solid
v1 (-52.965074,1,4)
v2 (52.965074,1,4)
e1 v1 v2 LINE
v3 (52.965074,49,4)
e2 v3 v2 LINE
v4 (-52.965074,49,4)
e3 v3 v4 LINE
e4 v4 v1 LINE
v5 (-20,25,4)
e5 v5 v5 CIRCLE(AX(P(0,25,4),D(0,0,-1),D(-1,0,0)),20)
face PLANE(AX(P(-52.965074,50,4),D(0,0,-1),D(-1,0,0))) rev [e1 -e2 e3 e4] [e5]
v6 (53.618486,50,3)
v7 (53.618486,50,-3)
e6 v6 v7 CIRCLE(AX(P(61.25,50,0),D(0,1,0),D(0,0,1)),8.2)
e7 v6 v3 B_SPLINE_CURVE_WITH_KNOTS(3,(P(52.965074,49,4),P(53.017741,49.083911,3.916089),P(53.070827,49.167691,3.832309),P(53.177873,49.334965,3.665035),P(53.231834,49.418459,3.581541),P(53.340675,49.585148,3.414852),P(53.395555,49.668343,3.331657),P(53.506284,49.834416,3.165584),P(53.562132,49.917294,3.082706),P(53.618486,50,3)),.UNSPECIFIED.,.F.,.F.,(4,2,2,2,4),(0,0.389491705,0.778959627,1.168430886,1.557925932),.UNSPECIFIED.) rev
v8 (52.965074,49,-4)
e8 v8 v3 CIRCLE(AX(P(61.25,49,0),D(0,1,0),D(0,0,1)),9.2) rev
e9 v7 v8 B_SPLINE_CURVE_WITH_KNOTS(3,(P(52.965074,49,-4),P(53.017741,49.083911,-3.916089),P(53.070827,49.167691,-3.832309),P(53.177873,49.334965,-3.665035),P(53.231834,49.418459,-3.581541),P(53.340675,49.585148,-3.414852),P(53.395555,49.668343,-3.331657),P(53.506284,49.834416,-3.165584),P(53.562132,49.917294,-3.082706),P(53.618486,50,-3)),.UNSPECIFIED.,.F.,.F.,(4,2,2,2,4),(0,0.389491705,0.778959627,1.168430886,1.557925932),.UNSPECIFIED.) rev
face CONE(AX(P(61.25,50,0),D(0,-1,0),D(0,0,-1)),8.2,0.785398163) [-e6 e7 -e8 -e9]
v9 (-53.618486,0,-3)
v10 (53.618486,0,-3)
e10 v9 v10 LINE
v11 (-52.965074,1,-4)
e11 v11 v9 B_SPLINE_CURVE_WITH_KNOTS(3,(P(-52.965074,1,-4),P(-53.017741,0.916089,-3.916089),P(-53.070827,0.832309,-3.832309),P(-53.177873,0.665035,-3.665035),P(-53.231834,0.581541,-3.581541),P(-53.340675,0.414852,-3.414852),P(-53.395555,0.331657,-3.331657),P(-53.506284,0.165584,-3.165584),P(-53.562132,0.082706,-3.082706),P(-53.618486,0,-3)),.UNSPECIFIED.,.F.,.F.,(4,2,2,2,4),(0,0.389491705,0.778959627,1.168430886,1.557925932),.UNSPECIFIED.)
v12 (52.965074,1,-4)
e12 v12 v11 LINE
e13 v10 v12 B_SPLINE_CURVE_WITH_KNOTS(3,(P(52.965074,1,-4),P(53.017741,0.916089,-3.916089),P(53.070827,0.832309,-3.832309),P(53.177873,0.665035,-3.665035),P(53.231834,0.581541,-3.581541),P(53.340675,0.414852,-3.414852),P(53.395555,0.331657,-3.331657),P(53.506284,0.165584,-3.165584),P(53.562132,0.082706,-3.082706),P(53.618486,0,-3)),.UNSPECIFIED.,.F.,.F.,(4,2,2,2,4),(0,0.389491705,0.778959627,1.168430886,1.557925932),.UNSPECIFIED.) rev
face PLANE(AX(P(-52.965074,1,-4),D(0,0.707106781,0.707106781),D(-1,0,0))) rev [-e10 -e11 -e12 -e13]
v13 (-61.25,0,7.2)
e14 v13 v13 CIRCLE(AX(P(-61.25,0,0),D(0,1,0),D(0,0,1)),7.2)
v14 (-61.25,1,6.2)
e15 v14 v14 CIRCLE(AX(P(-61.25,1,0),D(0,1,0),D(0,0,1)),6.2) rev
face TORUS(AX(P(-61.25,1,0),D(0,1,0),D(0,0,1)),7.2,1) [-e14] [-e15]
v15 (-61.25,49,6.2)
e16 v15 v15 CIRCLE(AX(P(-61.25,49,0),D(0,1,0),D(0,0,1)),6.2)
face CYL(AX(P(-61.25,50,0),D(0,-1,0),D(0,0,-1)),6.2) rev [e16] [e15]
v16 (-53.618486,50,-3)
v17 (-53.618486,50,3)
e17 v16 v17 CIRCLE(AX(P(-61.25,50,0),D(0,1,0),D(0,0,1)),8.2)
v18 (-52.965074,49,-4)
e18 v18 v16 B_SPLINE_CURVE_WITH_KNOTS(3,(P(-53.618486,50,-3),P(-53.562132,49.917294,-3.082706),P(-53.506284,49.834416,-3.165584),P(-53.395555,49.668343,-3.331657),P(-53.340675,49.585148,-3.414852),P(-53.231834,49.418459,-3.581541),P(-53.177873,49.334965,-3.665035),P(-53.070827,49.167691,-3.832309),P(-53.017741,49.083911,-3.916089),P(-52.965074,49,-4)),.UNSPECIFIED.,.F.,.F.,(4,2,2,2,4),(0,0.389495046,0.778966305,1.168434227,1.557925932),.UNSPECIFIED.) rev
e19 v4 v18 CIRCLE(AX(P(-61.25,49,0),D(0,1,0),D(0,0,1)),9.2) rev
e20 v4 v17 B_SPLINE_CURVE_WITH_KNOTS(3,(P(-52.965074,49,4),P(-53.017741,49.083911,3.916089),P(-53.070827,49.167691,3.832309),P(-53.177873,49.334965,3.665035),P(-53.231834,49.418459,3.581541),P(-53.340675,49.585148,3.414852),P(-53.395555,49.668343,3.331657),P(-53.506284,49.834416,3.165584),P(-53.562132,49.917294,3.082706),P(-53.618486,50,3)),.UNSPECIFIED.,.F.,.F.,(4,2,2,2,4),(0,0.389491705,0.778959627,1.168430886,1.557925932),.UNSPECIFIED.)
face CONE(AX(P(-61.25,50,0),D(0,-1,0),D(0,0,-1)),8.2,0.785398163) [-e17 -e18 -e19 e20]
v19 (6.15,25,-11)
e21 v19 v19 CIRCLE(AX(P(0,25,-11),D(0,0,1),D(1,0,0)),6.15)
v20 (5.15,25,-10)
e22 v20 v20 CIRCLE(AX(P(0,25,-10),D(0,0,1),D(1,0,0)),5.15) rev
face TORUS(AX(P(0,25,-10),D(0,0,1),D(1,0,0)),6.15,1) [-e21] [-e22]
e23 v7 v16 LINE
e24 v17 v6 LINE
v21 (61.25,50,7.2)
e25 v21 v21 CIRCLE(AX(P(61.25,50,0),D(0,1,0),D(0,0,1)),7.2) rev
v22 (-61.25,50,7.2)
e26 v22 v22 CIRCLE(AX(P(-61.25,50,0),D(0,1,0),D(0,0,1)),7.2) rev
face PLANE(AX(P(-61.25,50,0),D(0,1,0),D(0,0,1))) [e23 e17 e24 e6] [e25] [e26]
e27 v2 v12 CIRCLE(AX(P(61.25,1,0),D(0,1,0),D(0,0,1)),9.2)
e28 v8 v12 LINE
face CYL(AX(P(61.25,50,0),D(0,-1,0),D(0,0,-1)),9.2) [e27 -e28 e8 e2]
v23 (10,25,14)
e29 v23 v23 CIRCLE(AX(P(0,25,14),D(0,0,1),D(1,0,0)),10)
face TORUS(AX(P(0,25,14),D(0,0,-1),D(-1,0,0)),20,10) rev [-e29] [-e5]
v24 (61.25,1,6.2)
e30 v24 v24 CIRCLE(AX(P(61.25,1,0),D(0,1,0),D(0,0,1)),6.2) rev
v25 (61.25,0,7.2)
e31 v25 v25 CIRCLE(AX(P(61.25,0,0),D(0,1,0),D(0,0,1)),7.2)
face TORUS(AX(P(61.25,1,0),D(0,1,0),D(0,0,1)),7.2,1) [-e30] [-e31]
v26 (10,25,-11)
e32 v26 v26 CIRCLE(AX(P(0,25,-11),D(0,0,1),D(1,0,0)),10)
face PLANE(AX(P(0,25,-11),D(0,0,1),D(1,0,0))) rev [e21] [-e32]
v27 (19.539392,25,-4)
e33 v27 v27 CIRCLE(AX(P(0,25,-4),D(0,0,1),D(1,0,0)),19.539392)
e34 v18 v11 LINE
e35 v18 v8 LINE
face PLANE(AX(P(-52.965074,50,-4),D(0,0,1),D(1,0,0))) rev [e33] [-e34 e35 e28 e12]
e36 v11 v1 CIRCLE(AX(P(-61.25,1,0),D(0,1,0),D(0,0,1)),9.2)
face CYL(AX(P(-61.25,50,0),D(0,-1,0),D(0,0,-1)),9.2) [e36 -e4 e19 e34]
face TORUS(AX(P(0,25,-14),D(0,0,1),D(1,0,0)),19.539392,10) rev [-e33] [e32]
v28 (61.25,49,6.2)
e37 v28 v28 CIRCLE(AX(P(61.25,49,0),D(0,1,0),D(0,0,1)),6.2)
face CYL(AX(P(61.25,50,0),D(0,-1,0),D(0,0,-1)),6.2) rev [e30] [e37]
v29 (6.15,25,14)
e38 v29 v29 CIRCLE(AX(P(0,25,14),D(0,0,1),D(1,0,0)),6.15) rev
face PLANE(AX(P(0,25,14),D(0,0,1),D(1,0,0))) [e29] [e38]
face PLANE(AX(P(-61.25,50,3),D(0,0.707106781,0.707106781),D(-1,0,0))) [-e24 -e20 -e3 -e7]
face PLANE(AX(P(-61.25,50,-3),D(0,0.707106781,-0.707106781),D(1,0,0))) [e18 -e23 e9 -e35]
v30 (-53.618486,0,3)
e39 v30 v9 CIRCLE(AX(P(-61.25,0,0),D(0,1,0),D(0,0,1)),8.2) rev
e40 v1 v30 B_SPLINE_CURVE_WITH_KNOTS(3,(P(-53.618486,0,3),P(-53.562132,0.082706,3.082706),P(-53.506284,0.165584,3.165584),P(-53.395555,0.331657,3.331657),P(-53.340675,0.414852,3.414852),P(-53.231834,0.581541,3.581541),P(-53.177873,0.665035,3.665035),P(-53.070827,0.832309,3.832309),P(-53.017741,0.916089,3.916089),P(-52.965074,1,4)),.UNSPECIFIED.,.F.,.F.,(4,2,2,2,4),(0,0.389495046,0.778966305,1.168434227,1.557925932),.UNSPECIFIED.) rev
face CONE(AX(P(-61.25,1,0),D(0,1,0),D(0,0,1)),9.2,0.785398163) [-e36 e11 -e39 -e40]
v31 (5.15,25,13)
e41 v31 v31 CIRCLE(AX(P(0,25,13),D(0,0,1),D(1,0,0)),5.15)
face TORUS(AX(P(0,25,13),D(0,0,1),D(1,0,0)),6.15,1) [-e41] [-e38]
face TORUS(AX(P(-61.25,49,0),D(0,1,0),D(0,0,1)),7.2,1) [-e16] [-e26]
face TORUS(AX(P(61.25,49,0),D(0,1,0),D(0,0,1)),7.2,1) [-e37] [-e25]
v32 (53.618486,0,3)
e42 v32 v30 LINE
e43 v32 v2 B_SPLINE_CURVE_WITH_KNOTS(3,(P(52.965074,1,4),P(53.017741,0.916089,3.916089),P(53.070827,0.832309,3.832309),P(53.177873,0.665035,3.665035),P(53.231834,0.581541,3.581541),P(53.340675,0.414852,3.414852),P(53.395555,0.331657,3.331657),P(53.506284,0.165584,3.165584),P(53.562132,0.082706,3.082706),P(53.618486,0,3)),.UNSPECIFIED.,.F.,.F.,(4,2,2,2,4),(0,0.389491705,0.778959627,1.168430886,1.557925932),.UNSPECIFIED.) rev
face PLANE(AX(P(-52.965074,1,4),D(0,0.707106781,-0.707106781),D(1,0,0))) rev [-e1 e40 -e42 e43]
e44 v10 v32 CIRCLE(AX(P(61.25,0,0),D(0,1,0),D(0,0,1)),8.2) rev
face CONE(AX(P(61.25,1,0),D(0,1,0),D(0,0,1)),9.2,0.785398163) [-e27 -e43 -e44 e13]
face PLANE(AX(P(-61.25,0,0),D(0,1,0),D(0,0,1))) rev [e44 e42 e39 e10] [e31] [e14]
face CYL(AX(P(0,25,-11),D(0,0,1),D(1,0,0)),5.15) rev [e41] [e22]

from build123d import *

# Parameters (mm, degrees)
SKETCH1_R                = 6.2
BOSS_EXTRUDE1_DEPTH      = 50
BOSS_EXTRUDE2_DEPTH      = 10
BOSS_EXTRUDE2_DEPTH_BACK = 15
SKETCH2_R                = 10
SKETCH2_R_2              = 5.15
SKETCH3_R                = 5.15
CUT_EXTRUDE2_DEPTH       = 10
FILLET1_R                = 10
FILLET2_R                = 1
CHAMFER1_SIZE            = 1


with BuildPart() as part:
    # Sketch1 → Boss-Extrude1 (new body)
    with BuildSketch(Plane(origin=(0, 0, 0), x_dir=(1, 0, 0), z_dir=(0, 1, 0))):
        with BuildLine():
            Line((-52.965073929, 4), (52.965073929, 4))
            ThreePointArc((52.965073929, 4), (70.45, 0), (52.965073929, -4))
            Line((52.965073929, -4), (-52.965073929, -4))
            ThreePointArc((-52.965073929, -4), (-70.45, 0), (-52.965073929, 4))
        make_face()
        with Locations(Location((-61.25, 0, 0), (0, 0, 270))):
            Circle(SKETCH1_R, mode=Mode.SUBTRACT)
        with Locations(Location((61.25, 0, 0), (0, 0, 90))):
            Circle(SKETCH1_R, mode=Mode.SUBTRACT)
    extrude(amount=BOSS_EXTRUDE1_DEPTH)

    # Sketch2 → Boss-Extrude2 (add, two sides: drawn at the far end of the back side and taken through both)
    with BuildSketch(Plane.XY.offset(4).offset(-BOSS_EXTRUDE2_DEPTH_BACK)):
        with Locations((0, 25)):
            Circle(SKETCH2_R)
        with Locations((0, 25)):
            Circle(SKETCH2_R_2, mode=Mode.SUBTRACT)
    extrude(amount=BOSS_EXTRUDE2_DEPTH + BOSS_EXTRUDE2_DEPTH_BACK)

    # Sketch3 → Cut-Extrude2 (cut)
    with BuildSketch(Plane.XY.offset(4)):
        with Locations((0, 25)):
            Circle(SKETCH3_R)
    extrude(amount=-CUT_EXTRUDE2_DEPTH, mode=Mode.SUBTRACT)

    # Fillet1
    # the kernel refuses this fillet: 10 mm, written as the material it adds along each edge
    with BuildSketch(Plane(origin=(0, 25, 4), x_dir=(1, 0, 0), z_dir=(0, -1, 0))) as fillet1_piece_1:
        with BuildLine():
            CenterArc((10 + FILLET1_R, FILLET1_R), FILLET1_R, 180, 90)
            Line((10, FILLET1_R), (10 - FILLET1_R * 0.02, FILLET1_R))
            Line((10 - FILLET1_R * 0.02, FILLET1_R), (10 - FILLET1_R * 0.02, -FILLET1_R * 0.02))
            Line((10 - FILLET1_R * 0.02, -FILLET1_R * 0.02), (10 + FILLET1_R, -FILLET1_R * 0.02))
            Line((10 + FILLET1_R, -FILLET1_R * 0.02), (10 + FILLET1_R, 0))
        make_face()
    revolve(axis=Axis((0, 25, 4), (0, 0, 1)))
    with BuildSketch(Plane(origin=(0, 25, -4), x_dir=(1, 0, 0), z_dir=(0, -1, 0))) as fillet1_piece_2:
        with BuildLine():
            CenterArc((19.539392014, -10), FILLET1_R, 90, 72.542396876)
            Line((10, -7), (9.80921216, -6.94))
            ThreePointArc((9.80921216, -6.94), (9.8, -3.5), (9.8, 0))
            Line((9.8, 0), (10, 0.2))
            Line((10, 0.2), (19.539392014, 0.2))
            Line((19.539392014, 0.2), (19.539392014, 0))
        make_face()
    revolve(axis=Axis((0, 25, -4), (0, 0, 1)))

    # Fillet2
    fillet2_edges = [part.edges().sort_by_distance(p)[0] for p in [
        (-61.25, 0, -6.2),
        (-61.25, 50, -6.2),
        (61.25, 0, 6.2),
        (61.25, 50, 6.2),
        (-5.15, 25, 14),
        (-5.15, 25, -11),
    ]]
    fillet(fillet2_edges, radius=FILLET2_R)

    # Chamfer1
    chamfer1_edges = [part.edges().sort_by_distance(p)[0] for p in [
        (70.45, 50, 0),
        (0, 50, -4),
        (-70.45, 50, 0),
        (0, 0, -4),
        (70.45, 0, 0),
        (0, 0, 4),
        (-70.45, 0, 0),
        (0, 50, 4),
    ]]
    chamfer(chamfer1_edges, length=CHAMFER1_SIZE)


solid = part.part
